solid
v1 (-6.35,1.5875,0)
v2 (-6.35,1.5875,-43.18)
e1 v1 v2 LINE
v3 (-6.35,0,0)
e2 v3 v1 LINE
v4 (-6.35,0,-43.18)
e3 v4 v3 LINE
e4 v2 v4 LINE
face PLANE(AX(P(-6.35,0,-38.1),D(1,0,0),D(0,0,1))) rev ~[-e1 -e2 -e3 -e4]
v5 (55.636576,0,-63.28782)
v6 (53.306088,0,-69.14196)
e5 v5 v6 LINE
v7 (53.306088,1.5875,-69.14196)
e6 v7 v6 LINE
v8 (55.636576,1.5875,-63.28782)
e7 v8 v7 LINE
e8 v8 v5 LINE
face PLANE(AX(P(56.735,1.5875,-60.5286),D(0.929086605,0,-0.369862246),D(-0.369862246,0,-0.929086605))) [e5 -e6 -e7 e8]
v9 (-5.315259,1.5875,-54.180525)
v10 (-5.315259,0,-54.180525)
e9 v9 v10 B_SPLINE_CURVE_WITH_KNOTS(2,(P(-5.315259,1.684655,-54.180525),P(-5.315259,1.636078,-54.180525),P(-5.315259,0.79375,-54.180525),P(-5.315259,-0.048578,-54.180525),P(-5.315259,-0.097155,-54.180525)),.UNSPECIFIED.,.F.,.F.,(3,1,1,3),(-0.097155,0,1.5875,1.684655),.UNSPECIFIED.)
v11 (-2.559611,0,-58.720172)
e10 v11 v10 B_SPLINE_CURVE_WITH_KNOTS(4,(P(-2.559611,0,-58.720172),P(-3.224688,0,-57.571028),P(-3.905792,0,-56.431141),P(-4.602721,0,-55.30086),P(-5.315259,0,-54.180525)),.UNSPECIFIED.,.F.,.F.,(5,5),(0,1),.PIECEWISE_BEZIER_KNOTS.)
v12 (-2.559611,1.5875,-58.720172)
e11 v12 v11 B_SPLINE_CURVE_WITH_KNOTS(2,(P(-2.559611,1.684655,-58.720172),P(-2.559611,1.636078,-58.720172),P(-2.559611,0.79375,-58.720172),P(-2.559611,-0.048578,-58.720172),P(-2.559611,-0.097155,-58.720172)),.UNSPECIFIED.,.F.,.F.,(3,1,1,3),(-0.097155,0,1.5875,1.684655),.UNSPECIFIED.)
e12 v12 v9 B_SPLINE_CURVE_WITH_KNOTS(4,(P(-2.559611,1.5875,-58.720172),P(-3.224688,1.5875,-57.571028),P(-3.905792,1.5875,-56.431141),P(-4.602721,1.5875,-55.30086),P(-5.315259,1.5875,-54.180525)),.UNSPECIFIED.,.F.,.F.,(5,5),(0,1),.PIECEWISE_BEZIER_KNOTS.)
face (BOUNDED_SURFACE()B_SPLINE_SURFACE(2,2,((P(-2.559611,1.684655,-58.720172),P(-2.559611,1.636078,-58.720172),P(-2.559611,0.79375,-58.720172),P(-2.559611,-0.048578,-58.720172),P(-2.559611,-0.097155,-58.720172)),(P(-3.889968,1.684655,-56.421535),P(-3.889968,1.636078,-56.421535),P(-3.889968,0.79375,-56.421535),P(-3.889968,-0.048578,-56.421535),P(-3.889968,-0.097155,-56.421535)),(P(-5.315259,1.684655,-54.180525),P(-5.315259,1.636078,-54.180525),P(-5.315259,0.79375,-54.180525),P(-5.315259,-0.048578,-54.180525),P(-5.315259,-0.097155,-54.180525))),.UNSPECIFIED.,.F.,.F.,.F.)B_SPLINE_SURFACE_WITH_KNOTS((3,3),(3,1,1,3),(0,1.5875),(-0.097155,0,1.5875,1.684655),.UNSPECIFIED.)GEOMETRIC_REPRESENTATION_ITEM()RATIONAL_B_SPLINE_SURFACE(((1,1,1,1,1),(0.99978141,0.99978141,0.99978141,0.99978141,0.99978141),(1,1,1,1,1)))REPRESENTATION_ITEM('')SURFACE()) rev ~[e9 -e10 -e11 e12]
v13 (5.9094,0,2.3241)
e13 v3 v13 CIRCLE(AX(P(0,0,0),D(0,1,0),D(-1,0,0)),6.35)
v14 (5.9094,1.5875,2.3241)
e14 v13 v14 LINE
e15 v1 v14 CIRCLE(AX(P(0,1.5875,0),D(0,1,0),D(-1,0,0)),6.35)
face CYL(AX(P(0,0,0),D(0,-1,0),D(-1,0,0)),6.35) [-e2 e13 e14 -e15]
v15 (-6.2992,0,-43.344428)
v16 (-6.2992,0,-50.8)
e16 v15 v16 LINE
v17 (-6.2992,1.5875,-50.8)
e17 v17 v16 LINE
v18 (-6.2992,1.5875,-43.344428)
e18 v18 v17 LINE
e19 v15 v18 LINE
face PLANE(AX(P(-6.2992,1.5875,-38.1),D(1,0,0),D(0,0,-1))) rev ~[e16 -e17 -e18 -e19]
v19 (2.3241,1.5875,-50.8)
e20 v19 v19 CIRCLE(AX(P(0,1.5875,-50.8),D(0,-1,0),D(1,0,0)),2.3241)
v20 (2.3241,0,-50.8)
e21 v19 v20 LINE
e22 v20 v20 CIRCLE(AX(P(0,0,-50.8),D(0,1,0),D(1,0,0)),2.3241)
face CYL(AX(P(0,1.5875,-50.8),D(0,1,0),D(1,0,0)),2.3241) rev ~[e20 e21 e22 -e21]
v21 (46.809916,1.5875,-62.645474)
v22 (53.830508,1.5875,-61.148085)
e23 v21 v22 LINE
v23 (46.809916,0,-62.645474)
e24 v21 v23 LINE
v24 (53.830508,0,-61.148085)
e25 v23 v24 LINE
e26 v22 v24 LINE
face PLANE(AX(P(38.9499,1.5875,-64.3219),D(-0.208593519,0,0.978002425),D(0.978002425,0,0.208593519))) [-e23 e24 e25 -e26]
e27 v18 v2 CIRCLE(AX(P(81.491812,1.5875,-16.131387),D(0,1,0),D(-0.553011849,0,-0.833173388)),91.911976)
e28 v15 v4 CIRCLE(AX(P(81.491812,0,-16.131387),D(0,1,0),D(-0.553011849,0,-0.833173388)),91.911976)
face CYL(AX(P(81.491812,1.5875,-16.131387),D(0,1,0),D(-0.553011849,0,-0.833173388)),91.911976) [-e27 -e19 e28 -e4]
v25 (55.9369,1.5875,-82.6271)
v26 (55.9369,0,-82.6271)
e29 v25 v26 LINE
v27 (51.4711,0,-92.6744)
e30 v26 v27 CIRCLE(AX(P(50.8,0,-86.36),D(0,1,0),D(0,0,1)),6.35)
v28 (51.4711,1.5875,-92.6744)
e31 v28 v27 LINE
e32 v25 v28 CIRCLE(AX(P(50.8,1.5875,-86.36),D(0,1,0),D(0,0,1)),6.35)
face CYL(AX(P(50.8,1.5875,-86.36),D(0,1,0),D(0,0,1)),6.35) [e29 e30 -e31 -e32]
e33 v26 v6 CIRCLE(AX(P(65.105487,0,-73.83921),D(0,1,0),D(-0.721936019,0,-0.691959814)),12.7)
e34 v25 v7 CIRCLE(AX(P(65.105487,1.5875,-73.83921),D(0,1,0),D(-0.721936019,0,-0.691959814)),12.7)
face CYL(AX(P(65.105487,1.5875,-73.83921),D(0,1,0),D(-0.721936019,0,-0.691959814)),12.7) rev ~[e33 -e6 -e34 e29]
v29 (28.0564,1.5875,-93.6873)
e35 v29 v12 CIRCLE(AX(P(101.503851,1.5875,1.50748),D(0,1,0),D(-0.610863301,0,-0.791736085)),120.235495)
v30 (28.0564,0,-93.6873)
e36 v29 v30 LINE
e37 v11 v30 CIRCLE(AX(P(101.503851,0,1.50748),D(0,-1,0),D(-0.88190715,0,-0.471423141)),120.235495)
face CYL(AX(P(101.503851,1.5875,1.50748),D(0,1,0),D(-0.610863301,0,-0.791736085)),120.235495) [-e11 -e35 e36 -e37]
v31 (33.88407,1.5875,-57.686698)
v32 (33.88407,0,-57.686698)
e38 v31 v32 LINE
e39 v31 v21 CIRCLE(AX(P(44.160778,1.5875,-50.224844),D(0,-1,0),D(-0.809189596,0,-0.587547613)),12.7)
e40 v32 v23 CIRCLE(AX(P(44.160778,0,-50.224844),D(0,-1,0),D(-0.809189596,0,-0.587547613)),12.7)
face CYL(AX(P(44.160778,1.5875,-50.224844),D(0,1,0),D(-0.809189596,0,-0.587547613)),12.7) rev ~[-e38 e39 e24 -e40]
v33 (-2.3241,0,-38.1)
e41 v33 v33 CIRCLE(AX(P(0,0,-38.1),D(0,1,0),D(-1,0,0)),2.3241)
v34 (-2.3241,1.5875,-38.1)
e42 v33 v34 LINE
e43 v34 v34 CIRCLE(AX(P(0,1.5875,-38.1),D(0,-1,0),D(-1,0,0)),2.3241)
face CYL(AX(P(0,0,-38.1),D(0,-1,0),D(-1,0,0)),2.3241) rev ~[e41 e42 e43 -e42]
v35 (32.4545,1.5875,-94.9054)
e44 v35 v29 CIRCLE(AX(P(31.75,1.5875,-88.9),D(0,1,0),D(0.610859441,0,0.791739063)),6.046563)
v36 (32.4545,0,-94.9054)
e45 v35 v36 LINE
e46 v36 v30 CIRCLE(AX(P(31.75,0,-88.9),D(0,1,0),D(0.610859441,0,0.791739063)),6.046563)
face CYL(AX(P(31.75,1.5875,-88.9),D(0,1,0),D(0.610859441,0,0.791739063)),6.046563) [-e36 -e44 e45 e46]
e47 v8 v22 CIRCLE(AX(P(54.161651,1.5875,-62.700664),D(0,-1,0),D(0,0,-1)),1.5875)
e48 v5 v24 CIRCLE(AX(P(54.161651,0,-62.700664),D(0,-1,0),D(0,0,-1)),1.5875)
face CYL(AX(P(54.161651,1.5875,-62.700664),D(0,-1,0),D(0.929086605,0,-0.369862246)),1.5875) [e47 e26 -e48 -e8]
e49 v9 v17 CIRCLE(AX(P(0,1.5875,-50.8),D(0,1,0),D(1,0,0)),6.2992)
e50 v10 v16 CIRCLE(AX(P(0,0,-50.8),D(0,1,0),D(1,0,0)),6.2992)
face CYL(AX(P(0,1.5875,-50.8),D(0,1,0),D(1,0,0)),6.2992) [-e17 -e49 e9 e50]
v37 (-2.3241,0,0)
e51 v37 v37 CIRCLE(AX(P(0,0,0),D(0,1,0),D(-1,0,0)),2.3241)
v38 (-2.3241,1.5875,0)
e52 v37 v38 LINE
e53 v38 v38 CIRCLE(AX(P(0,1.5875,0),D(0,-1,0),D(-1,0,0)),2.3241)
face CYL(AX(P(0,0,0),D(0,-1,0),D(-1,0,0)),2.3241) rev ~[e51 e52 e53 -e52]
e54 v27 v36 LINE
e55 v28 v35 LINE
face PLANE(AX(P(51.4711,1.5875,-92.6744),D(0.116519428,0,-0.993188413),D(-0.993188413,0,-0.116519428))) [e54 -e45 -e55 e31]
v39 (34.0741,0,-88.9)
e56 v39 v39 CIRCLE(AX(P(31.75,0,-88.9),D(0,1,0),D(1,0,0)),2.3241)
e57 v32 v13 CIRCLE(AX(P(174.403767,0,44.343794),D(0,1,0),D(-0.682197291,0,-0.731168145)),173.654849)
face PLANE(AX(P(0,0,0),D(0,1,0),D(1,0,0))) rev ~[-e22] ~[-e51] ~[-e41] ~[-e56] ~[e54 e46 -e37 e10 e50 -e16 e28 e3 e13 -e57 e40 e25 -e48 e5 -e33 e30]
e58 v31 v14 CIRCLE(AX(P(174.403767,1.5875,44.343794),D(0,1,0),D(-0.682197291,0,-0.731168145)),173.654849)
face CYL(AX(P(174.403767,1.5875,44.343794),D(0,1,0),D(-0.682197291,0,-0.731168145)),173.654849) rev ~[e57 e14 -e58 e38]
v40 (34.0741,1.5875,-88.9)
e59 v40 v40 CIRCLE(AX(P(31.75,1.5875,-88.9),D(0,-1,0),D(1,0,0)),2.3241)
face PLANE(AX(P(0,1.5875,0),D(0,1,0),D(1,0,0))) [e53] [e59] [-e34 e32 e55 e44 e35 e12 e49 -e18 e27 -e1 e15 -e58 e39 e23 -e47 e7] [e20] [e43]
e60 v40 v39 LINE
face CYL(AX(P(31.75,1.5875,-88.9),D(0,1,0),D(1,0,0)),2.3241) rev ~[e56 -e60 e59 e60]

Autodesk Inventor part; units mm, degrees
ref_plane "YZ Plane" through (0, 0, 0) normal (1, 0, 0) x (0, 1, 0)
ref_plane "XZ Plane" through (0, 0, 0) normal (0, 1, 0) x (-1, 0, 0)
ref_plane "XY Plane" through (0, 0, 0) normal (0, 0, 1) x (1, 0, 0)
sketch "Sketch1" plane through (0, 0, 0) normal (0, 1, 0) x (-1, 0, 0)
  circle A0 centre (0, 0) radius 2.3241
  line L0 (0, 0) -> (0, -38.1)
  circle A1 centre (0, -38.1) radius 2.3241
  line L1 (0, 0) -> (0, -38.1) construction
  line L2 (-6.35, 0) -> (-6.35, -38.1)
  line L3 (6.35, -38.1) -> (6.35, 0)
  arc A2 (6.35, 0) -> (-6.35, 0) centre (0, 0) ccw
  arc A3 (-6.35, -38.1) -> (6.35, -38.1) centre (0, -38.1) ccw
  line L4 (0, -38.1) -> (-15.9411, -38.1) construction
  line L5 (0, -31.75) -> (-15.9411, -31.75)
  line L6 (-15.9411, -44.45) -> (0, -44.45)
  arc A4 (0, -44.45) -> (0, -31.75) centre (0, -38.1) ccw
  arc A5 (-15.9411, -31.75) -> (-15.9411, -44.45) centre (-15.9411, -38.1) ccw
  line L7 (-5.9094, 2.3241) -> (-21.799, -35.6488)
  point P0 (0, -19.05)
  point P1 (-7.9706, -38.1)
  dimension "d0" = 4.6482
  dimension "d1" = 38.1
  dimension "d2" = 4.6482
  dimension "d3" = 12.7
extrude "Extrusion1" add sketch "Sketch1" along normal blind 1.5875
sketch "Sketch2" plane through (0, 1.5875, 0) normal (0, 1, 0) x (1, 0, 0)
  circle A0 centre (0, 38.1) radius 2.3241 projected
  line L0 (0, 38.1) -> (0, 31.75)
  line L1 (0, 31.75) -> (0, 92.71) construction
  line L2 (6.35, 38.1) -> (6.35, 86.36)
  line L3 (-6.35, 86.36) -> (-6.35, 38.1)
  arc A1 (-6.35, 38.1) -> (6.35, 38.1) centre (0, 38.1) ccw
  arc A2 (6.35, 86.36) -> (-6.35, 86.36) centre (0, 86.36) ccw
  line L4 (-6.35, 86.36) -> (57.15, 86.36) construction
  line L5 (0, 80.01) -> (50.8, 80.01)
  line L6 (50.8, 92.71) -> (0, 92.71)
  arc A3 (0, 92.71) -> (0, 80.01) centre (0, 86.36) ccw
  arc A4 (50.8, 80.01) -> (50.8, 92.71) centre (50.8, 86.36) ccw
  line L7 (-6.35, 38.1) -> (-6.35, 0) projected
  arc A5 (-6.35, 0) -> (5.9094, -2.3241) centre (0, 0) ccw projected
  line L8 (5.9094, -2.3241) -> (21.799, 35.6488) projected
  arc A6 (21.799, 35.6488) -> (15.9411, 44.45) centre (15.9411, 38.1) ccw projected
  line L9 (15.9411, 44.45) -> (0, 44.45) projected
  arc A7 (0, 44.45) -> (-6.35, 38.1) centre (0, 38.1) ccw projected
  circle A8 centre (0, 0) radius 2.3241 projected
  circle A9 centre (0, 38.1) radius 2.3241 projected
  line L10 (21.799, 35.6488) -> (55.9369, 82.6271)
  point P0 (0, 62.23)
  point P1 (25.4, 86.36)
  point P2 (0, 92.71)
  point P3 (6.35, 44.45)
  dimension "d6" = 6.35
  dimension "d7" = 60.96
  dimension "d10" = 63.5
extrude "Extrusion2" add sketch "Sketch2" against normal blind 1.5875 contours A1 A7 L9 L2 | L9 A7 L3 A3 L5 L2 | L2 L5 A4 L10 A6 L9 | L5 A3 A2 L2 | L2 A2 L6 A4 L5
sketch "Sketch3" plane through (0, 1.5875, 0) normal (0, 1, 0) x (1, 0, 0)
  arc A0 (55.9369, 82.6271) -> (50.8, 92.71) centre (50.8, 86.36) ccw projected
  line L0 (5.9094, -2.3241) -> (21.799, 35.6488) projected
  arc A1 (55.9369, 82.6271) -> (5.9094, -2.3241) centre (174.4039, -44.3439) ccw
  line L1 (21.799, 35.6488) -> (55.9369, 82.6271) projected
  point P0 (0, 0)
extrude "Extrusion3" cut sketch "Sketch3" against normal blind 1.5875
sketch "Sketch4" plane through (0, 1.5875, 0) normal (0, 1, 0) x (1, 0, 0)
  line L0 (0, 92.71) -> (50.8, 92.71) projected
  line L1 (-6.35, 86.36) -> (-6.35, 0) projected
  arc A0 (30.6634, 92.71) -> (-6.35, 43.18) centre (81.4918, 16.1314) ccw
  arc A1 (55.9369, 82.6271) -> (5.9094, -2.3241) centre (174.4039, -44.3439) ccw projected
  arc A2 (55.9369, 82.6271) -> (50.8, 92.71) centre (50.8, 86.36) ccw projected
  line L2 (50.8, 92.71) -> (0, 92.71) projected
  arc A3 (0, 92.71) -> (-6.35, 86.36) centre (0, 86.36) ccw projected
  line L3 (-6.35, 86.36) -> (-6.35, 0) projected
  arc A4 (-6.35, 0) -> (5.9094, -2.3241) centre (0, 0) ccw projected
  circle A5 centre (0, 0) radius 2.3241 projected
  circle A6 centre (0, 38.1) radius 2.3241 projected
extrude "Extrusion4" cut sketch "Sketch4" against normal blind 1.5875 contours L0 A0 L1 A3
sketch "Sketch5" plane through (0, 1.5875, 0) normal (0, 1, 0) x (1, 0, 0)
  point P0 (0, 0)
sketch "Sketch6" plane through (0, 1.5875, 0) normal (0, 1, 0) x (1, 0, 0)
  circle A0 centre (0, 38.1) radius 2.3241 projected
  line L0 (0, 38.1) -> (0, 50.8)
  circle A1 centre (0, 50.8) radius 2.3241
  point P0 (0, 0)
  dimension "d15" = 12.7
  dimension "d16" = 4.6482
extrude "Extrusion5" cut sketch "Sketch6" against normal blind 1.5875 contours A1
sketch "Sketch7" plane through (0, 1.5875, 0) normal (0, 1, 0) x (1, 0, 0)
  circle A0 centre (0, 50.8) radius 2.3241 projected
  circle A1 centre (0, 38.1) radius 2.3241
  arc A2 (6.2992, 38.1) -> (-6.2992, 38.1) centre (0, 38.1) ccw
  circle A3 centre (0, 38.1) radius 2.3241 projected
  line L0 (0, 50.8) -> (0, 88.9)
  arc A4 (35.4436, 84.1127) -> (5.3749, 48.0302) centre (101.5031, -1.5067) ccw
  arc A5 (31.75, 88.9) -> (0, 50.8) centre (101.5031, -1.5067) ccw
  arc A6 (31.75, 88.9) -> (0, 50.8) centre (101.5031, -1.5067) ccw construction
  arc A7 (28.0564, 93.6873) -> (-5.3749, 53.5698) centre (101.5031, -1.5067) ccw
  line L1 (0, 88.9) -> (31.75, 88.9)
  arc A8 (35.4436, 84.1127) -> (28.0564, 93.6873) centre (31.75, 88.9) ccw
  line L2 (0, 50.8) -> (6.2992, 50.8)
  circle A9 centre (0, 50.8) radius 2.3241
  arc A10 (6.2992, 50.8) -> (-6.2992, 50.8) centre (0, 50.8) ccw
  line L3 (-6.2992, 50.8) -> (0, 50.8)
  arc A11 (-5.3749, 53.5698) -> (5.3749, 48.0302) centre (0, 50.8) ccw
  line L4 (-6.2992, 38.1) -> (-6.2992, 50.8)
  line L5 (0, 38.1) -> (0, 50.8) construction
  line L6 (6.2992, 50.8) -> (6.2992, 38.1)
  circle A12 centre (0, 38.1) radius 2.3241
  circle A13 centre (31.75, 88.9) radius 2.3241
  point P0 (0, 0)
  point P1 (0, 44.45)
  point P2 (-4.5326, 55.1744)
  point P3 (6.2992, 49.7843)
  point P4 (0, 57.0992)
  point P5 (2.3241, 50.8)
  point P6 (0, 53.1241)
  dimension "d19" = 4.6482
  dimension "d40" = 4.6482
extrude "Extrusion6" add sketch "Sketch7" against normal blind 1.5875 contours L2 L6 A4 A11 L3 A0 | L3 A11 A7 A10 L0 A0 | A10 A5 A13 L1 A7 A8 A4 L6 | A10 L0 A7 L1 A13 A5 | A11 A4 L6 A2 L4 L3 | L3 A10 A7 A11 | A10 A7 L0 | A13 L1 A5 | A5 L1 A13
sketch "Sketch8" plane through (0, 1.5875, 0) normal (0, 1, 0) x (1, 0, 0)
  circle A0 centre (0, 50.8) radius 2.3241 projected
  circle A1 centre (0, 38.1) radius 2.3241 projected
  circle A2 centre (0, 0) radius 2.3241 projected
  arc A3 (36.4452, 92.71) -> (28.0564, 93.6873) centre (31.75, 88.9) ccw projected
  arc A4 (28.0564, 93.6873) -> (-4.5326, 55.1744) centre (101.5031, -1.5067) ccw projected
  arc A5 (-4.5326, 55.1744) -> (-6.2992, 50.8) centre (0, 50.8) ccw projected
  line L0 (-6.2992, 50.8) -> (-6.2992, 43.3444) projected
  arc A6 (-6.2992, 43.3444) -> (-6.35, 43.18) centre (81.4918, 16.1314) ccw projected
  line L1 (-6.35, 43.18) -> (-6.35, 0) projected
  arc A7 (-6.35, 0) -> (5.9094, -2.3241) centre (0, 0) ccw projected
  arc A8 (55.9369, 82.6271) -> (5.9094, -2.3241) centre (174.4039, -44.3439) ccw projected
  arc A9 (55.9369, 82.6271) -> (50.8, 92.71) centre (50.8, 86.36) ccw projected
  line L2 (50.8, 92.71) -> (36.4452, 92.71) projected
  arc A10 (55.9369, 82.6271) -> (50.8, 92.71) centre (50.8, 86.36) ccw projected
  line L3 (51.4711, 92.6744) -> (32.4545, 94.9054)
extrude "Extrusion7" add sketch "Sketch8" against normal blind 1.5875 contours A3 L3 A9 L2
sketch "Sketch11" plane through (0, 1.5875, 0) normal (0, 1, 0) x (1, 0, 0)
  arc A0 (55.9369, 82.6271) -> (5.9094, -2.3241) centre (174.4039, -44.3439) ccw projected
  line L0 (38.9499, 64.3219) -> (56.735, 60.5286)
  line L1 (56.735, 60.5286) -> (50.1783, 76.9989)
  circle A1 centre (0, 50.8) radius 2.3241 projected
  circle A2 centre (0, 38.1) radius 2.3241 projected
  circle A3 centre (0, 0) radius 2.3241 projected
  arc A4 (32.4545, 94.9054) -> (28.0564, 93.6873) centre (31.75, 88.9) ccw projected
  arc A5 (28.0564, 93.6873) -> (-4.5326, 55.1744) centre (101.5031, -1.5067) ccw projected
  arc A6 (-4.5326, 55.1744) -> (-6.2992, 50.8) centre (0, 50.8) ccw projected
  line L2 (-6.2992, 50.8) -> (-6.2992, 43.3444) projected
  arc A7 (-6.2992, 43.3444) -> (-6.35, 43.18) centre (81.4918, 16.1314) ccw projected
  line L3 (-6.35, 43.18) -> (-6.35, 0) projected
  arc A8 (-6.35, 0) -> (5.9094, -2.3241) centre (0, 0) ccw projected
  arc A9 (55.9369, 82.6271) -> (5.9094, -2.3241) centre (174.4039, -44.3439) ccw projected
  arc A10 (55.9369, 82.6271) -> (51.4711, 92.6744) centre (50.8, 86.36) ccw projected
  line L4 (51.4711, 92.6744) -> (32.4545, 94.9054) projected
extrude "Extrusion10" add sketch "Sketch11" against normal blind 1.5875 contours L1 L0 A0
fillet "Fillet4" radius 12.7 2 edges at (50.1783, 0.7937, -76.9989) (38.9499, 0.7937, -64.3219)
fillet "Fillet5" radius 1.5875 1 edges at (56.735, 0.7937, -60.5286)
extrude "Extrusion11" cut sketch "Sketch7" against normal blind 1.5875 contours A13 L1 A5 | A5 L1 A13
fillet "Fillet6" radius 127 1 edges at (-4.5326, 0.7937, -55.1744)
properties part number "Lady Brown Tabs"
